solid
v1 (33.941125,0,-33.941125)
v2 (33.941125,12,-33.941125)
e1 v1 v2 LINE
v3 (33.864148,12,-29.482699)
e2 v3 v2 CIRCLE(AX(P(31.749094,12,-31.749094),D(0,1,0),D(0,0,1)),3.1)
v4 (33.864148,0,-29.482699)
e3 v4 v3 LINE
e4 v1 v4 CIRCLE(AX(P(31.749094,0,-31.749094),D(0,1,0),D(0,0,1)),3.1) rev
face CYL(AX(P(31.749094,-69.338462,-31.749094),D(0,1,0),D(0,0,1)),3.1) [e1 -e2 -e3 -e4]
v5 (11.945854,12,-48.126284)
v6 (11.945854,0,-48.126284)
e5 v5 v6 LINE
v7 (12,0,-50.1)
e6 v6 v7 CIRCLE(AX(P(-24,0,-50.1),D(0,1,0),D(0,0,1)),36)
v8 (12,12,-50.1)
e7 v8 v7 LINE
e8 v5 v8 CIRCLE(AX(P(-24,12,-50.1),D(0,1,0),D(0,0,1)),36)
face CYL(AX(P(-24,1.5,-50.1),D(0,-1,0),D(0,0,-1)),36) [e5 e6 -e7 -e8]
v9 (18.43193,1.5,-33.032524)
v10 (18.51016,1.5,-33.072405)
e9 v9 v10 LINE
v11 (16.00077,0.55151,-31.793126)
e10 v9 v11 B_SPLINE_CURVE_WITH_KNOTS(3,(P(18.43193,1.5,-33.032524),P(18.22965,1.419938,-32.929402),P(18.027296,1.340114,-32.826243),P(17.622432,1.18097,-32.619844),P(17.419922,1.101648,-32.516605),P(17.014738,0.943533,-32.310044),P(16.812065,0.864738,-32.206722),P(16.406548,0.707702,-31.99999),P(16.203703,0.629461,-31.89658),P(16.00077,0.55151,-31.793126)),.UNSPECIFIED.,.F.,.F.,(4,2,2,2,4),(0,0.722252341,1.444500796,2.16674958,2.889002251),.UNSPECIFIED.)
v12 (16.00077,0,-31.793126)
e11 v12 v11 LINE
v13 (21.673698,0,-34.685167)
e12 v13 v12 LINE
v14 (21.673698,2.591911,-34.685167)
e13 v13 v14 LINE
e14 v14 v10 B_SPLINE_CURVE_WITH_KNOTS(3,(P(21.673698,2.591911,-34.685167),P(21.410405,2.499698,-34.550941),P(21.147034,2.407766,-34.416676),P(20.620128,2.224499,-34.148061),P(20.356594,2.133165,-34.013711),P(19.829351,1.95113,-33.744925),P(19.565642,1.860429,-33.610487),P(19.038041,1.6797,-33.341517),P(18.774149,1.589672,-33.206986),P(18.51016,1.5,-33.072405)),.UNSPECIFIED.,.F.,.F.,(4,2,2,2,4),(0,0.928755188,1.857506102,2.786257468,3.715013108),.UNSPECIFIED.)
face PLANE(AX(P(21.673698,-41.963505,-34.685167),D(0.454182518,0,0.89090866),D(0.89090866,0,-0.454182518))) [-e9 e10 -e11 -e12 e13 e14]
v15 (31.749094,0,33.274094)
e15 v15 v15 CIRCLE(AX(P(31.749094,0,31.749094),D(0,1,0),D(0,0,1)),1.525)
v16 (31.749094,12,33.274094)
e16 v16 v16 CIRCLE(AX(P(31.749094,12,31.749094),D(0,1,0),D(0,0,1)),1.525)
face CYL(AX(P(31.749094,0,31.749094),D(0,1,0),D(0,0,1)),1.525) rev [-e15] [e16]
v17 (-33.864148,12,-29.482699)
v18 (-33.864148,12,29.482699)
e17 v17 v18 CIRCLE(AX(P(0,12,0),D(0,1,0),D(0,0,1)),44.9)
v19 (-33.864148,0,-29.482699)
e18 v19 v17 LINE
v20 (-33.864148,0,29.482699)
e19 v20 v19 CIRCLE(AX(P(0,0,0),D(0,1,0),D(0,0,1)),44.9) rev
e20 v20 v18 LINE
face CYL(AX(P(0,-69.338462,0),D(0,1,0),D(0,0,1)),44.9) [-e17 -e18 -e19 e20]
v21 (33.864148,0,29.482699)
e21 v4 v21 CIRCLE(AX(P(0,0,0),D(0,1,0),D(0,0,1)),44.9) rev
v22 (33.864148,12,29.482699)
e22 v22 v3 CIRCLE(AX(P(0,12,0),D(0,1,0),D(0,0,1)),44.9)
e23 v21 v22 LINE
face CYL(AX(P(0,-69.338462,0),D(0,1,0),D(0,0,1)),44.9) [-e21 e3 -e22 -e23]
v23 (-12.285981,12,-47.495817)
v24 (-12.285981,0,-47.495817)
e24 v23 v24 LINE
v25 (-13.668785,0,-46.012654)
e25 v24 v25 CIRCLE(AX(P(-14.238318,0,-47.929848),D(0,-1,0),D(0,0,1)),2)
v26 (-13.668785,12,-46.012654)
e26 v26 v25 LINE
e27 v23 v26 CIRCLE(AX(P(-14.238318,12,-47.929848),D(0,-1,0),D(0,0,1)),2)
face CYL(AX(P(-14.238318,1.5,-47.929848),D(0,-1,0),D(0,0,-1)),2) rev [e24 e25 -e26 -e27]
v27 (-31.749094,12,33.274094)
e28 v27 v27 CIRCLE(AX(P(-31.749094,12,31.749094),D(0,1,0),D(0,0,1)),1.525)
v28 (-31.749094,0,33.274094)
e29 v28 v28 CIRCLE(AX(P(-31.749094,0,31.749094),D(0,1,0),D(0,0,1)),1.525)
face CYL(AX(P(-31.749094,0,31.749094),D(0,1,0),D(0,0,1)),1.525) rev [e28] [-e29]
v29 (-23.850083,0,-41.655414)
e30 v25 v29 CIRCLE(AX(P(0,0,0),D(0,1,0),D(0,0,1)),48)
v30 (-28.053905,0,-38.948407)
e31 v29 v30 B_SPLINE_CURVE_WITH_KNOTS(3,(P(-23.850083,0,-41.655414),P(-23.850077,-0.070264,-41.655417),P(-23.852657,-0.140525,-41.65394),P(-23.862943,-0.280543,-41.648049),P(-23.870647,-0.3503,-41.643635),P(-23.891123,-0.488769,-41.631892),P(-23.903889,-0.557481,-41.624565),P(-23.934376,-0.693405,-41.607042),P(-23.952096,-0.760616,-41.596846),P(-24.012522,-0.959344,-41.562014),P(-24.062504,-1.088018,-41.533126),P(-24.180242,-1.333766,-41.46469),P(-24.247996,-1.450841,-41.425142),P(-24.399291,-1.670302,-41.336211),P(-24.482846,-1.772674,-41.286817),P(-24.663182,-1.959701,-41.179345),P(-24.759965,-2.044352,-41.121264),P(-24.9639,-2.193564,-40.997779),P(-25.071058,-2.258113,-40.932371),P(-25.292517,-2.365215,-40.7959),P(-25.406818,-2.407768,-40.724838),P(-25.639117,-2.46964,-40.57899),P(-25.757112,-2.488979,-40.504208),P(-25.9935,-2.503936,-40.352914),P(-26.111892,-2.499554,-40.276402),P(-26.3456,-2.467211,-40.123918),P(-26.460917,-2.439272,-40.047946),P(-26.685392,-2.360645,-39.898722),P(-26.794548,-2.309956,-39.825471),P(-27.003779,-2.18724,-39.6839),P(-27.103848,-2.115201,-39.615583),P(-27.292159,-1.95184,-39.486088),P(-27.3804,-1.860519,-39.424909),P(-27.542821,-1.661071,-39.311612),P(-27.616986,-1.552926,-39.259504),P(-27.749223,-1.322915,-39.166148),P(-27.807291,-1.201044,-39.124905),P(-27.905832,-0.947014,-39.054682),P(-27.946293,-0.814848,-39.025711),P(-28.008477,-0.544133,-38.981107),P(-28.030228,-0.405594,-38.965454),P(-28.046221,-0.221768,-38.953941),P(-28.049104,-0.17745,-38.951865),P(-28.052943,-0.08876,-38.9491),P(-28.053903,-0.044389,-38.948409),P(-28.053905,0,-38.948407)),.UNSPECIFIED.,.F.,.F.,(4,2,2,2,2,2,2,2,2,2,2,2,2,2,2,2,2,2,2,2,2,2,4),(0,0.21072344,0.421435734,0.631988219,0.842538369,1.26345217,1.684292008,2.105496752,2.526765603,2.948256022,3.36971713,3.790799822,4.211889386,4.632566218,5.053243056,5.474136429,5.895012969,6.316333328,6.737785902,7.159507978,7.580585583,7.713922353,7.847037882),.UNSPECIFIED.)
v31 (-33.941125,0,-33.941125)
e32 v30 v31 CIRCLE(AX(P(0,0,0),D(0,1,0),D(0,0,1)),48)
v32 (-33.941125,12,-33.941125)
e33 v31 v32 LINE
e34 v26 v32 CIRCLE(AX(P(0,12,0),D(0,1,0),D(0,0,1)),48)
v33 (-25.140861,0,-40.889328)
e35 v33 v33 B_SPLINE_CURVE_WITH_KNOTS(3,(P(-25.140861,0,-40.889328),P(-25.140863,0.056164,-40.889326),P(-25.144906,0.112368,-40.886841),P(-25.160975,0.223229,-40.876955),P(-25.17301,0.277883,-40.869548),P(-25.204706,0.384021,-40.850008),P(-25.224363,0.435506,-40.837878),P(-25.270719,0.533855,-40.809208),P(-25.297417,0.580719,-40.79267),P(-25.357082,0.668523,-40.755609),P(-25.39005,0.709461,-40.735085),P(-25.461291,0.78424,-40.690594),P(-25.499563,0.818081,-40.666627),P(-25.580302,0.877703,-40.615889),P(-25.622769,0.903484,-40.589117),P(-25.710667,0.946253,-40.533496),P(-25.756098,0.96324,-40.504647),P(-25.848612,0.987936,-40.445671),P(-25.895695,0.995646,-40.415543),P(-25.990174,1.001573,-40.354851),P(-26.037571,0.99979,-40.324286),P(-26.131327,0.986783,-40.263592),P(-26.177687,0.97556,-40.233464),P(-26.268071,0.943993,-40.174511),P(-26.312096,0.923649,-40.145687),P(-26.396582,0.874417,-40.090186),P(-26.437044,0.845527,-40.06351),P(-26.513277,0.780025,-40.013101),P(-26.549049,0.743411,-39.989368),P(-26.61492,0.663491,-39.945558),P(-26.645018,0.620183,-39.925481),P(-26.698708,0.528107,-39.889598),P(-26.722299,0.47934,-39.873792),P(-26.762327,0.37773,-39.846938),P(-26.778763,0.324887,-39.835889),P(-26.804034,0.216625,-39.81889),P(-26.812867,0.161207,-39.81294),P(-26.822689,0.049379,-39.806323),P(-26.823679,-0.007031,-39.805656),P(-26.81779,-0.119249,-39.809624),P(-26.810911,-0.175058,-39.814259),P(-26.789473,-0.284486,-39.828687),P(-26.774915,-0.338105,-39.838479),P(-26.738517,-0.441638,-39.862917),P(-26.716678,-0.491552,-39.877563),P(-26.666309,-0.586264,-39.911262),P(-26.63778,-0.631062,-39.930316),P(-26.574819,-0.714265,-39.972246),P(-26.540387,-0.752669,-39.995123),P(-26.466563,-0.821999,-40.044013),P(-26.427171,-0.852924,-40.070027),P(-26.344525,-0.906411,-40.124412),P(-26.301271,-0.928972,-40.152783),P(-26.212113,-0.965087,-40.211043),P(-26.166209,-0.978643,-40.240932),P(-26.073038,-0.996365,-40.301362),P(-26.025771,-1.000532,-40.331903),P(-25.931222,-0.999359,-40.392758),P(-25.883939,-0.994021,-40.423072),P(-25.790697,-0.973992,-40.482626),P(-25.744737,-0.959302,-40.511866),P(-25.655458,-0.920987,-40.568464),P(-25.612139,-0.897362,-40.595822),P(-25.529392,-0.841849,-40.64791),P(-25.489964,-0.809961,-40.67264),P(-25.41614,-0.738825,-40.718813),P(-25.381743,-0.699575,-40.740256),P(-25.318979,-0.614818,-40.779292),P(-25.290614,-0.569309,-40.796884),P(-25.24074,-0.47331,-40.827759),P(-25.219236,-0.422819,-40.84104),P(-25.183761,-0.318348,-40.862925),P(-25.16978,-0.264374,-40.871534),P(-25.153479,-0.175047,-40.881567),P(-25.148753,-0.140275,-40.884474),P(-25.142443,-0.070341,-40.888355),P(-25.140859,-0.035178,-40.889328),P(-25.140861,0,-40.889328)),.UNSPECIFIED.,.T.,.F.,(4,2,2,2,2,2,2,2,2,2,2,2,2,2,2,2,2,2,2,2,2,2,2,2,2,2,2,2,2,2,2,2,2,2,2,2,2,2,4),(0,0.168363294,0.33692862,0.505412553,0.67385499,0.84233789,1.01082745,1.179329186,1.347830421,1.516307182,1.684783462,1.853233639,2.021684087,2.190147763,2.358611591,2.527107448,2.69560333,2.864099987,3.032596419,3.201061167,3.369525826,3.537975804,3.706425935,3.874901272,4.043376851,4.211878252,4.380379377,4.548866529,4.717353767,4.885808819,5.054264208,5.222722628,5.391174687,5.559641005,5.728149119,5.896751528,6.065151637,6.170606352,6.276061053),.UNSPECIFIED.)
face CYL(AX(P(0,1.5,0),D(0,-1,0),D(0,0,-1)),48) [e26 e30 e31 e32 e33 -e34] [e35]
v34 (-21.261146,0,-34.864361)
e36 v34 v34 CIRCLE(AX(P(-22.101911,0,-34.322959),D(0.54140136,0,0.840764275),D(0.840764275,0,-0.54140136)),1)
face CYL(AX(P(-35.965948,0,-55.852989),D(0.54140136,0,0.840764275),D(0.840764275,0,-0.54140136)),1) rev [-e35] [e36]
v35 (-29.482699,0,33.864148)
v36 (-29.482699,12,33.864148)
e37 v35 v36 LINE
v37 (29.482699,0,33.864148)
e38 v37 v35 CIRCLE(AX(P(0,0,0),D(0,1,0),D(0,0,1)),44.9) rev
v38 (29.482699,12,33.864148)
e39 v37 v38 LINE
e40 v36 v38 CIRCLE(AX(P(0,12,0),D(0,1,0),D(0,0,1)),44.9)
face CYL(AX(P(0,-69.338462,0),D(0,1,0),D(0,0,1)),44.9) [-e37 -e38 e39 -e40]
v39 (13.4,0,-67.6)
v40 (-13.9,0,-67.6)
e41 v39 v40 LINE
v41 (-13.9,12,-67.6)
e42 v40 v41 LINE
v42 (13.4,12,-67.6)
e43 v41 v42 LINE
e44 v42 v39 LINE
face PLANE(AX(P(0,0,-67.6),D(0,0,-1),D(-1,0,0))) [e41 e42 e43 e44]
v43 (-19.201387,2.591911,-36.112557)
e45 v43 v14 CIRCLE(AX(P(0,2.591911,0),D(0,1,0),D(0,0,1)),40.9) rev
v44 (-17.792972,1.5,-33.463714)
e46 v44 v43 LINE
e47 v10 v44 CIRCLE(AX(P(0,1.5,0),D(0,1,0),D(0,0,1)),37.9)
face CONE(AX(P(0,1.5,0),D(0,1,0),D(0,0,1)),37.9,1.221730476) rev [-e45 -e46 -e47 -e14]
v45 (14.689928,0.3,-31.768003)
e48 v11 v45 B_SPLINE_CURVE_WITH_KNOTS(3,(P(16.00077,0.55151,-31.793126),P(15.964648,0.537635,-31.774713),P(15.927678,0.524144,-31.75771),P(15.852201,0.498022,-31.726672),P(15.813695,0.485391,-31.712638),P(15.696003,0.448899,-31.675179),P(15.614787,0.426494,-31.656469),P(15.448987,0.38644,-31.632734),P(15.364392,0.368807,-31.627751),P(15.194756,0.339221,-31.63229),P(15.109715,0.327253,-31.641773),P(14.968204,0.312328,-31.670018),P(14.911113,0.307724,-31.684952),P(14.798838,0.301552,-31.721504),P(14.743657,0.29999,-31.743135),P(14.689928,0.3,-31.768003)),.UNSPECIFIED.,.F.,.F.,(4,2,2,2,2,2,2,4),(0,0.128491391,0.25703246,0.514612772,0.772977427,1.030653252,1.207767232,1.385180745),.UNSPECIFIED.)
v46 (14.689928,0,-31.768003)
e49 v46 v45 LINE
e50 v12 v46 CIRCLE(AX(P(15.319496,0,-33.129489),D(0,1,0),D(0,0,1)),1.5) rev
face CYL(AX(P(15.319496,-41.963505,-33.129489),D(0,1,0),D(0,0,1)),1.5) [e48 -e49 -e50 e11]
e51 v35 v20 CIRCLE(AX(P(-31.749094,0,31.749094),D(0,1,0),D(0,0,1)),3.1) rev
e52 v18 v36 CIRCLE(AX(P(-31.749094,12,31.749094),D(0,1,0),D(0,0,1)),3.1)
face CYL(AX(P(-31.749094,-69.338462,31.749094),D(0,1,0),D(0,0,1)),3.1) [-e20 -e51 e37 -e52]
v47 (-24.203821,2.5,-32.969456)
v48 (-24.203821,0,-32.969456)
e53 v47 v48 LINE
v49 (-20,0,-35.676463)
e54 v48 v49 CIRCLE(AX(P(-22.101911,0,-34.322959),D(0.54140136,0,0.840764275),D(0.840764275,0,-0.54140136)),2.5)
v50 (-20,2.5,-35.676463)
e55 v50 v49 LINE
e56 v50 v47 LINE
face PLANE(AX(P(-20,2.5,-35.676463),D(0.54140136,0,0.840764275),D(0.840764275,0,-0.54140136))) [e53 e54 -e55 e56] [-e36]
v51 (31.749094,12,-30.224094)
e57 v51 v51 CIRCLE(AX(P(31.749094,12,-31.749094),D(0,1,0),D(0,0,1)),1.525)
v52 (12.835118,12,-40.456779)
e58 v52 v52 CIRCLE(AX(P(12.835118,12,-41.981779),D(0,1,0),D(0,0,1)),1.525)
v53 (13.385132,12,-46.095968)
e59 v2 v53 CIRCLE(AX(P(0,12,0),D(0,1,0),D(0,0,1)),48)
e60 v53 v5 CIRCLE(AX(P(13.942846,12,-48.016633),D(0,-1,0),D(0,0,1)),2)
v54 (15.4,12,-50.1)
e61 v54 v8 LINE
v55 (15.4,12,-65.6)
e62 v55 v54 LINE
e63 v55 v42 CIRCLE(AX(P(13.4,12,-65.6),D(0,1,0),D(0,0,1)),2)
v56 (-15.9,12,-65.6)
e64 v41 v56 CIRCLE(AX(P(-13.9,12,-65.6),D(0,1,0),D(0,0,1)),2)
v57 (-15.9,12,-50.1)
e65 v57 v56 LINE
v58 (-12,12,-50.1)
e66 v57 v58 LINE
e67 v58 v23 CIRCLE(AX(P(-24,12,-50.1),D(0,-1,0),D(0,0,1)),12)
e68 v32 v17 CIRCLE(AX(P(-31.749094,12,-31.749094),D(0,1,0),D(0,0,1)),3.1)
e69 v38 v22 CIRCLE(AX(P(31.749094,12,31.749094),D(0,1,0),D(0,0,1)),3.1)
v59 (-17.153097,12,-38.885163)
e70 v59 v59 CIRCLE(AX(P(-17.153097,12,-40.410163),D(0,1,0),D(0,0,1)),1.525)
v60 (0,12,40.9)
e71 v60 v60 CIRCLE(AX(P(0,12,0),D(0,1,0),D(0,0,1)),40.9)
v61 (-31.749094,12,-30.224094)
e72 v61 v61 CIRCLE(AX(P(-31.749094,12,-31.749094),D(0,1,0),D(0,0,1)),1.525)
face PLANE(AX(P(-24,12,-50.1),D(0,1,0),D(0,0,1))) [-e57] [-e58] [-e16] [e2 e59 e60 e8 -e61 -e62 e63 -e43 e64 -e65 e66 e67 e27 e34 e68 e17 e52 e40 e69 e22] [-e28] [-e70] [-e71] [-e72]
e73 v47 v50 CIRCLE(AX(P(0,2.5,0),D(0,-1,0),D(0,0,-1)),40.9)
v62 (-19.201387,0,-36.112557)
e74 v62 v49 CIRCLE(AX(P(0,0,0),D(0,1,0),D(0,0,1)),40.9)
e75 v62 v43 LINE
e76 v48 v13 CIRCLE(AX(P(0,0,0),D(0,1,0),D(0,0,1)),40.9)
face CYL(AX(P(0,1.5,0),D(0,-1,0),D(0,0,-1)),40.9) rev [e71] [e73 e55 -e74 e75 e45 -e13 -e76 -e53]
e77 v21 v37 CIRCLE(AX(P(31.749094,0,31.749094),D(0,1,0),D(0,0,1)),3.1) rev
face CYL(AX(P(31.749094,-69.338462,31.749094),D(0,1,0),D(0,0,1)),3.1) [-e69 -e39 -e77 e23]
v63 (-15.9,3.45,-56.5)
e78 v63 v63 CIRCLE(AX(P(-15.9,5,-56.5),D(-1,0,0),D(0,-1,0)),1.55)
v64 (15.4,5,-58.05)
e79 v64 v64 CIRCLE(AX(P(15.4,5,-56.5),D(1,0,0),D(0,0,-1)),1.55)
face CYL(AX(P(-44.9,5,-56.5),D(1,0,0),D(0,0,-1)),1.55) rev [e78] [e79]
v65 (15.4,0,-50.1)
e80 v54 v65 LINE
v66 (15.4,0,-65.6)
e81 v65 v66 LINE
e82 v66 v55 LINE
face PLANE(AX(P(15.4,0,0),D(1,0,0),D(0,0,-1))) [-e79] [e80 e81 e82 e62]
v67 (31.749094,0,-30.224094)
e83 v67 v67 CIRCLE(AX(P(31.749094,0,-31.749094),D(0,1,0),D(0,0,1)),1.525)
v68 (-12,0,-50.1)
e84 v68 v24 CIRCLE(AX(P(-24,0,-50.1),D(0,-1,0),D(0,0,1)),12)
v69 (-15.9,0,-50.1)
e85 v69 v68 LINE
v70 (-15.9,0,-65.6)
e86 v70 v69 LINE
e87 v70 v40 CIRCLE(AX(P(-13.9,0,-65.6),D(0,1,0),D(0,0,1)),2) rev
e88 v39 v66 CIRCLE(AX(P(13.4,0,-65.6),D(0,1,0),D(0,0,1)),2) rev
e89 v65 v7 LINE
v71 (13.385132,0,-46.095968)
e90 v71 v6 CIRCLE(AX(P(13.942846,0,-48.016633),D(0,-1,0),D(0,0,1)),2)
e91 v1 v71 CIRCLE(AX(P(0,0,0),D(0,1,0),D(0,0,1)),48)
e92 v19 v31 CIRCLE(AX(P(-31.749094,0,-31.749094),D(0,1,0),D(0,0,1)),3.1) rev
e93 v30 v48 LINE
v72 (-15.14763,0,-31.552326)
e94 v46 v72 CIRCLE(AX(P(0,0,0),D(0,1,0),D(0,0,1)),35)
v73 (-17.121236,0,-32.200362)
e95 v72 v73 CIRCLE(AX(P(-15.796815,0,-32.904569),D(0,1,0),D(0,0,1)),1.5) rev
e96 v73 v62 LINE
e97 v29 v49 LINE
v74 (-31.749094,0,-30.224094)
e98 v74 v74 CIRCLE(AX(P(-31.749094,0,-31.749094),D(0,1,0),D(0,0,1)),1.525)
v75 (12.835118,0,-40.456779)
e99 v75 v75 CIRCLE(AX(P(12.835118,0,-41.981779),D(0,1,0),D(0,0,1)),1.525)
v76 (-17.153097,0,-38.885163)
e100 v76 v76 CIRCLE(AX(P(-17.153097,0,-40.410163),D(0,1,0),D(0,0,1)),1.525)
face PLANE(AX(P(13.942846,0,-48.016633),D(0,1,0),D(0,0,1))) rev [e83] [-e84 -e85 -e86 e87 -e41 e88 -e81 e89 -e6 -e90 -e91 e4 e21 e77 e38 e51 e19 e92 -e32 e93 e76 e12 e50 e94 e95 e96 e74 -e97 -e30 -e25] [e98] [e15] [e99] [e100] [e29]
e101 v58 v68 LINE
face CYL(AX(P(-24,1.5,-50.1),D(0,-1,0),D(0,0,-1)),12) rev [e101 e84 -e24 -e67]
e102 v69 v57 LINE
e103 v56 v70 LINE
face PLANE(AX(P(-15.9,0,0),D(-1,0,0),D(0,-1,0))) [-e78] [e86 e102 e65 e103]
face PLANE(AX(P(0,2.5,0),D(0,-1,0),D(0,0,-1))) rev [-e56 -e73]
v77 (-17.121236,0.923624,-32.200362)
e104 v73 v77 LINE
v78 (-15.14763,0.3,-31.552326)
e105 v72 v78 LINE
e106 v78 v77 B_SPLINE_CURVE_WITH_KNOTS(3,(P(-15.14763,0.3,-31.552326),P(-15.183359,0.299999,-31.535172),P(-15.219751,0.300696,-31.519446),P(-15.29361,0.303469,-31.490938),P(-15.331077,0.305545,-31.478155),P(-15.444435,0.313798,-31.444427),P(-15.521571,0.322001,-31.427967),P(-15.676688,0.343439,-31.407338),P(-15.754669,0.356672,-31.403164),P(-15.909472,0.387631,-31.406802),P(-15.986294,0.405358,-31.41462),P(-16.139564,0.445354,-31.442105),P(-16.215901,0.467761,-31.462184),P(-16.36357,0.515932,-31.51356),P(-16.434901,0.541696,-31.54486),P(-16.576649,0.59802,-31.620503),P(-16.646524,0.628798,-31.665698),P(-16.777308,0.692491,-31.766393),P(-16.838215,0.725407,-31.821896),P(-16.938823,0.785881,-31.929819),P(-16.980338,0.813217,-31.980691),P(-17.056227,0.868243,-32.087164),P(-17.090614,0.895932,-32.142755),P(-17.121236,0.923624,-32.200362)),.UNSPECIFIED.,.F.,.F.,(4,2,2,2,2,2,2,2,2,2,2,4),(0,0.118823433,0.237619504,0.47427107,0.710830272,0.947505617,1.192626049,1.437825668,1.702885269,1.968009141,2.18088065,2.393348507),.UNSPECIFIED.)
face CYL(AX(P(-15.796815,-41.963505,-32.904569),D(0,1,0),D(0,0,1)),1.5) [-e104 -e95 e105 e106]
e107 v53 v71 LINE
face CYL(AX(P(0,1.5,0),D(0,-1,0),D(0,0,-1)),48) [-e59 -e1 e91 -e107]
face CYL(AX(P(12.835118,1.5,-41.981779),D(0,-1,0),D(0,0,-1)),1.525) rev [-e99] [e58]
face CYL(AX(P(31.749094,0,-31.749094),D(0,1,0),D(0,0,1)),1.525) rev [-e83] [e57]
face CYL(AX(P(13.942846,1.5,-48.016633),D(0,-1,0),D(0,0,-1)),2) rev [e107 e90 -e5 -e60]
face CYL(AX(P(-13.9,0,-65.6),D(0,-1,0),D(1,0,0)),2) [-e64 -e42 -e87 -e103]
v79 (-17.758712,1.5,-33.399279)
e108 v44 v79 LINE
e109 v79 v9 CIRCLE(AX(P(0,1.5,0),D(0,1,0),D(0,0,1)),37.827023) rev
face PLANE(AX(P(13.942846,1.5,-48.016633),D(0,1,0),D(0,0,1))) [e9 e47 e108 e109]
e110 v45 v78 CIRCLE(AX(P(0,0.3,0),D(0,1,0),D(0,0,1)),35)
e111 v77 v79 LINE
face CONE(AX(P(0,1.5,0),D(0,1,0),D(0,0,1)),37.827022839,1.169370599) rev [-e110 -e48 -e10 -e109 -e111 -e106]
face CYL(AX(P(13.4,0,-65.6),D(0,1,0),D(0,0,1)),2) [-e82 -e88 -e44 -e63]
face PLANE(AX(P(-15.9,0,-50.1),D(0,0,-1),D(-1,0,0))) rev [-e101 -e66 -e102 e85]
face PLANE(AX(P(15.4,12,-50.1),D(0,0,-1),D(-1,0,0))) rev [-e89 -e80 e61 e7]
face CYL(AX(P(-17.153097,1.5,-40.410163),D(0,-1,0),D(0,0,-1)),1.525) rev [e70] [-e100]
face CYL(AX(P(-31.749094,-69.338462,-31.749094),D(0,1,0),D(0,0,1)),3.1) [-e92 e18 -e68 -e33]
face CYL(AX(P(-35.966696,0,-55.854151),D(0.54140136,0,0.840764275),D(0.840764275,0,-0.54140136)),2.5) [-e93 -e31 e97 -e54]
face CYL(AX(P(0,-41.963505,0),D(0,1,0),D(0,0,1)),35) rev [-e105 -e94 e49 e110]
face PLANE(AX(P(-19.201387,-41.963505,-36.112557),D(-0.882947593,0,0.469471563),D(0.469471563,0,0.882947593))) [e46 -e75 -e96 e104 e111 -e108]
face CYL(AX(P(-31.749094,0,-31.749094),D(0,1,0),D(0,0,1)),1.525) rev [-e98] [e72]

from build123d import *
from build123d.topology import SkipClean

# Parameters (mm, degrees)
SKETCH_1_R               = 40.9
SKETCH_1_R_2             = 1.525
EXTRUDE_1_DEPTH          = 1.5
EXTRUDE_START            = -1.5
EXTRUDE_2_DEPTH          = 1.5
CUT_EXTRUDE_1_DEPTH      = 70.399279535
CUT_EXTRUDE_1_DEPTH_BACK = 70.399279535
SKETCH_3_R               = 1.525
SKETCH_4_R               = 40.9
SKETCH_4_R_2             = 1.525
EXTRUDE_3_DEPTH          = 10.5
CUT_EXTRUDE_START        = -12
CUT_EXTRUDE_2_DEPTH      = 12
EXTRUDE_4_DEPTH          = 2.5
EXTRUDE_5_REACH          = 106.449
EXTRUDE_5_END_RADIUS     = 48
SKETCH_8_R               = 1
CUT_EXTRUDE_3_DEPTH      = 105.448711512
CHAMFER_1_SIZE           = 1.2
CHAMFER_1_SIZE_2         = 2.827022839
CHAMFER_2_SIZE           = 1.091910703
CHAMFER_2_SIZE_2         = 3
SKETCH_9_W               = 24
SKETCH_9_H               = 12
EXTRUDE_6_DEPTH          = 17.5
SKETCH_10_R              = 1.55
CUT_EXTRUDE_4_DEPTH      = 90.170454762
SKETCH_11_W              = 17.5
SKETCH_11_H              = 12
SKETCH_11_R              = 1.55
EXTRUDE_7_DEPTH          = 3.9
EXTRUDE_START_2          = 3.4
SKETCH_12_W              = 17.5
SKETCH_12_H              = 12
SKETCH_12_R              = 1.55
EXTRUDE_8_DEPTH          = 3.4
FILLET_1_R               = 2


with BuildPart() as part:
    # 草图1 → 凸台-拉伸1 (new body)
    with BuildSketch(Plane(origin=(0, 0, 0), x_dir=(1, 0, 0), z_dir=(0, 1, 0))):
        with BuildLine():
            Line((12, 50.1), (-12, 50.1))
            ThreePointArc((-12, 50.1), (-12.071709603, 48.790080839), (-12.285981368, 47.495817309))
            ThreePointArc((-12.285981368, 47.495817309), (-12.775478285, 46.565992731), (-13.668785094, 46.012653847))
            ThreePointArc((-13.668785094, 46.012653847), (0.147817484, -47.999772395), (13.385132402, 46.095967617))
            ThreePointArc((13.385132402, 46.095967617), (12.311228539, 46.859989672), (11.945854344, 48.126283833))
            ThreePointArc((11.945854344, 48.126283833), (11.98646104, 49.112770637), (12, 50.1))
        make_face()
        with Locations(Location((0, 0, 0), (0, 0, 270))):
            Circle(SKETCH_1_R, mode=Mode.SUBTRACT)
        with Locations(Location((12.835117837, 41.981778787, 0), (0, 0, 270))):
            Circle(SKETCH_1_R_2, mode=Mode.SUBTRACT)
        with Locations(Location((-17.153096541, 40.410163067, 0), (0, 0, 270))):
            Circle(SKETCH_1_R_2, mode=Mode.SUBTRACT)
    extrude(amount=EXTRUDE_1_DEPTH)

    # 草图2 → 凸台-拉伸2 (add)
    with BuildSketch(Plane(origin=(0, 1.5, 0), x_dir=(1, 0, 0), z_dir=(0, 1, 0)).offset(EXTRUDE_START)):
        with BuildLine():
            Line((-19.201386918, 36.112556548), (-17.121235913, 32.200361501))
            ThreePointArc((-17.121235913, 32.200361501), (-16.264760822, 31.479428059), (-15.147630365, 31.55232629))
            ThreePointArc((-15.147630365, 31.55232629), (-0.252986109, 34.999085674), (14.689928016, 31.768003004))
            ThreePointArc((14.689928016, 31.768003004), (15.348239226, 31.629764257), (16.000770136, 31.793125857))
            Line((16.000770136, 31.793125857), (21.673697907, 34.685167133))
            ThreePointArc((21.673697907, 34.685167133), (1.427389415, 40.875084825), (-19.201386918, 36.112556548))
        make_face()
    extrude(amount=EXTRUDE_2_DEPTH)

    # 草图3 → 切除-拉伸1 (cut, two sides: drawn at the far end of the back side and taken through both)
    with BuildSketch(Plane(origin=(0, 1.5, 0), x_dir=(1, 0, 0), z_dir=(0, 1, 0)).offset(-CUT_EXTRUDE_1_DEPTH_BACK)):
        with Locations(Location((31.749094475, 31.749094475, 0), (0, 0, 270))):
            Circle(SKETCH_3_R)
        with Locations(Location((31.749094475, -31.749094475, 0), (0, 0, 270))):
            Circle(SKETCH_3_R)
        with Locations(Location((-31.749094475, -31.749094475, 0), (0, 0, 270))):
            Circle(SKETCH_3_R)
        with Locations(Location((-31.749094475, 31.749094475, 0), (0, 0, 270))):
            Circle(SKETCH_3_R)
    extrude(amount=CUT_EXTRUDE_1_DEPTH + CUT_EXTRUDE_1_DEPTH_BACK, mode=Mode.SUBTRACT)

    # 草图4 → 凸台-拉伸3 (add)
    with SkipClean():  # the faces are left unmerged after this step: merging them gives an invalid solid
        with BuildSketch(Plane(origin=(0, 1.5, 0), x_dir=(1, 0, 0), z_dir=(0, 1, 0))):
            with BuildLine():
                Line((12, 50.1), (-12, 50.1))
                ThreePointArc((-12, 50.1), (-12.071709603, 48.790080839), (-12.285981368, 47.495817309))
                ThreePointArc((-12.285981368, 47.495817309), (-12.775478285, 46.565992731), (-13.668785094, 46.012653847))
                ThreePointArc((-13.668785094, 46.012653847), (0.147817484, -47.999772395), (13.385132402, 46.095967617))
                ThreePointArc((13.385132402, 46.095967617), (12.311228539, 46.859989672), (11.945854344, 48.126283833))
                ThreePointArc((11.945854344, 48.126283833), (11.98646104, 49.112770637), (12, 50.1))
            make_face()
            with Locations(Location((0, 0, 0), (0, 0, 118))):
                Circle(SKETCH_4_R, mode=Mode.SUBTRACT)
            with Locations(Location((-17.153096541, 40.410163067, 0), (0, 0, 270))):
                Circle(SKETCH_4_R_2, mode=Mode.SUBTRACT)
            with Locations(Location((12.835117837, 41.981778787, 0), (0, 0, 270))):
                Circle(SKETCH_4_R_2, mode=Mode.SUBTRACT)
            with Locations(Location((31.749094475, 31.749094475, 0), (0, 0, 270))):
                Circle(SKETCH_4_R_2, mode=Mode.SUBTRACT)
            with Locations(Location((31.749094475, -31.749094475, 0), (0, 0, 270))):
                Circle(SKETCH_4_R_2, mode=Mode.SUBTRACT)
            with Locations(Location((-31.749094475, -31.749094475, 0), (0, 0, 270))):
                Circle(SKETCH_4_R_2, mode=Mode.SUBTRACT)
            with Locations(Location((-31.749094475, 31.749094475, 0), (0, 0, 270))):
                Circle(SKETCH_4_R_2, mode=Mode.SUBTRACT)
        extrude(amount=EXTRUDE_3_DEPTH)
    add(part.part.scale(1), mode=Mode.REPLACE)  # the faces are merged on a copy

    # 草图5 → 切除-拉伸2 (cut)
    with BuildSketch(Plane(origin=(0, 12, 0), x_dir=(1, 0, 0), z_dir=(0, 1, 0)).offset(CUT_EXTRUDE_START)):
        with BuildLine():
            ThreePointArc((-33.864147525, 29.482698526), (-34.848632515, 31.695578705), (-33.941125497, 33.941125497))
            ThreePointArc((-33.941125497, 33.941125497), (-48, 0), (-33.941125497, -33.941125497))
            ThreePointArc((-33.941125497, -33.941125497), (-34.848632515, -31.695578705), (-33.864147525, -29.482698526))
            ThreePointArc((-33.864147525, -29.482698526), (-44.9, 0), (-33.864147525, 29.482698526))
        make_face()
        with BuildLine():
            ThreePointArc((33.864147525, -29.482698526), (34.848632515, -31.695578705), (33.941125497, -33.941125497))
            ThreePointArc((33.941125497, -33.941125497), (48, 0), (33.941125497, 33.941125497))
            ThreePointArc((33.941125497, 33.941125497), (34.848632515, 31.695578705), (33.864147525, 29.482698526))
            ThreePointArc((33.864147525, 29.482698526), (44.9, 0), (33.864147525, -29.482698526))
        make_face()
        with BuildLine():
            ThreePointArc((-29.482698526, -33.864147525), (-31.695578705, -34.848632515), (-33.941125497, -33.941125497))
            ThreePointArc((-33.941125497, -33.941125497), (0, -48), (33.941125497, -33.941125497))
            ThreePointArc((33.941125497, -33.941125497), (31.695578705, -34.848632515), (29.482698526, -33.864147525))
            ThreePointArc((29.482698526, -33.864147525), (0, -44.9), (-29.482698526, -33.864147525))
        make_face()
    extrude(amount=CUT_EXTRUDE_2_DEPTH, mode=Mode.SUBTRACT)

    # 草图6 → 凸台-拉伸4 (add)
    with BuildSketch(Plane.XZ):
        with BuildLine():
            Line((-20, -35.676462829), (-24.203821377, -32.969456027))
            ThreePointArc((-24.203821377, -32.969456027), (-22.14331564, -34.387258868), (-20, -35.676462829))
        make_face()
    extrude(amount=-EXTRUDE_4_DEPTH)

    # 凸台-拉伸5: up to this cylinder (the profile starts inside it)
    extrude_5_end = Plane(origin=(0, -1.061033, 0), z_dir=(0, -1, 0)) * Cylinder(EXTRUDE_5_END_RADIUS, 309.898, mode=Mode.PRIVATE)
    # 草图7 → 凸台-拉伸5 (add, up to the surface)
    with BuildSketch(Plane(origin=(-22.101910689, 0, -34.322959428), x_dir=(0.8407642754995167, 0, -0.5414013604007409), z_dir=(0.5414013604007408, 0, 0.8407642754995166)), mode=Mode.PRIVATE) as extrude_5_sk1:
        with BuildLine():
            Line((-2.5, 0), (2.5, 0))
            ThreePointArc((2.5, 0), (0, -2.5), (-2.5, 0))
        make_face()
    extrude_5_tool1 = extrude(extrude_5_sk1.sketch, amount=-EXTRUDE_5_REACH, mode=Mode.PRIVATE) & extrude_5_end
    add(extrude_5_tool1.solids().sort_by_distance((-22.101911, -1.061033, -34.322959))[0])

    # 草图8 → 切除-拉伸3 (cut, through all)
    with BuildSketch(Plane(origin=(-22.101910689, 0, -34.322959428), x_dir=(0.8407642754995167, 0, -0.5414013604007409), z_dir=(0.5414013604007408, 0, 0.8407642754995166))):
        Circle(SKETCH_8_R)
    extrude(amount=-CUT_EXTRUDE_3_DEPTH, mode=Mode.SUBTRACT)

    # 倒角1
    # the kernel refuses this chamfer: 2.827022839, 1.2 mm, written as the material it takes off along each edge
    with BuildSketch(Plane(origin=(0, 1.5, 0), x_dir=(-0.6107443245214345, 0, -0.7918278664361699), z_dir=(-0.7918278664361699, 0, 0.6107443245214345))) as chamfer_1_piece_1:
        Polygon((35, CHAMFER_1_SIZE), (35 + CHAMFER_1_SIZE_2, 0), (35, 0), align=None)
    revolve(axis=Axis((0, 1.5, 0), (0, -1, 0)), revolution_arc=74.458388902, mode=Mode.SUBTRACT)

    # 倒角2
    # the kernel refuses this chamfer: 3, 1.091910703 mm, written as the material it adds along each edge
    with BuildSketch(Plane(origin=(0, 1.5, 0), x_dir=(0.6807767680816117, 0, -0.7324909501422905), z_dir=(0.7324909501422905, 0, 0.6807767680816117))) as chamfer_2_piece_1_section:
        Polygon((40.9, CHAMFER_2_SIZE), (40.9 - CHAMFER_2_SIZE_2, 0), (40.9, 0), align=None)
    chamfer_2_piece_1 = revolve(axis=Axis((0, 1.5, 0), (0, 1, 0)), revolution_arc=70.9043723, mode=Mode.PRIVATE)
    chamfer_2_piece_1 = split(chamfer_2_piece_1, bisect_by=Plane(origin=(7.492047447, 2.005552707, -27.455404982), z_dir=(-0.45418251766199275, 0, -0.8909086601050715)), keep=Keep.TOP, mode=Mode.PRIVATE)
    add(chamfer_2_piece_1)

    # 草图9 → 凸台-拉伸6 (add)
    with BuildSketch(Plane(origin=(0, 0, -50.1), x_dir=(-1, 0, 0), z_dir=(0, 0, -1))):
        with Locations((0, 6)):
            Rectangle(SKETCH_9_W, SKETCH_9_H)
    extrude(amount=EXTRUDE_6_DEPTH)

    # 草图10 → 切除-拉伸4 (cut, through all)
    with BuildSketch(Plane(origin=(12, 0, 0), x_dir=(0, 0, -1), z_dir=(1, 0, 0))):
        with Locations((56.5, 5)):
            Circle(SKETCH_10_R)
    extrude(amount=-CUT_EXTRUDE_4_DEPTH, mode=Mode.SUBTRACT)

    # 草图11 → 凸台-拉伸7 (add)
    with SkipClean():  # the faces are left unmerged after this step: merging them gives an invalid solid
        with BuildSketch(Plane.ZY.offset(12)):
            with Locations((-58.85, 6)):
                Rectangle(SKETCH_11_W, SKETCH_11_H)
            with Locations(Location((-56.5, 5, 0), (0, 0, 180))):
                Circle(SKETCH_11_R, mode=Mode.SUBTRACT)
        extrude(amount=EXTRUDE_7_DEPTH)

    # 草图12 → 凸台-拉伸8 (add)
    with SkipClean():  # the faces are left unmerged after this step: merging them gives an invalid solid
        with BuildSketch(Plane(origin=(12, 0, 0), x_dir=(0, 0, -1), z_dir=(1, 0, 0)).offset(EXTRUDE_START_2)):
            with Locations((58.85, 6)):
                Rectangle(SKETCH_12_W, SKETCH_12_H)
            with Locations((56.5, 5)):
                Circle(SKETCH_12_R, mode=Mode.SUBTRACT)
        extrude(amount=-EXTRUDE_8_DEPTH)

    # 圆角1
    fillet_1_edges = [part.edges().sort_by_distance(p)[0] for p in [
        (-15.9, 6, -67.6),
        (15.4, 6, -67.6),
    ]]
    fillet(fillet_1_edges, radius=FILLET_1_R)


solid = part.part
